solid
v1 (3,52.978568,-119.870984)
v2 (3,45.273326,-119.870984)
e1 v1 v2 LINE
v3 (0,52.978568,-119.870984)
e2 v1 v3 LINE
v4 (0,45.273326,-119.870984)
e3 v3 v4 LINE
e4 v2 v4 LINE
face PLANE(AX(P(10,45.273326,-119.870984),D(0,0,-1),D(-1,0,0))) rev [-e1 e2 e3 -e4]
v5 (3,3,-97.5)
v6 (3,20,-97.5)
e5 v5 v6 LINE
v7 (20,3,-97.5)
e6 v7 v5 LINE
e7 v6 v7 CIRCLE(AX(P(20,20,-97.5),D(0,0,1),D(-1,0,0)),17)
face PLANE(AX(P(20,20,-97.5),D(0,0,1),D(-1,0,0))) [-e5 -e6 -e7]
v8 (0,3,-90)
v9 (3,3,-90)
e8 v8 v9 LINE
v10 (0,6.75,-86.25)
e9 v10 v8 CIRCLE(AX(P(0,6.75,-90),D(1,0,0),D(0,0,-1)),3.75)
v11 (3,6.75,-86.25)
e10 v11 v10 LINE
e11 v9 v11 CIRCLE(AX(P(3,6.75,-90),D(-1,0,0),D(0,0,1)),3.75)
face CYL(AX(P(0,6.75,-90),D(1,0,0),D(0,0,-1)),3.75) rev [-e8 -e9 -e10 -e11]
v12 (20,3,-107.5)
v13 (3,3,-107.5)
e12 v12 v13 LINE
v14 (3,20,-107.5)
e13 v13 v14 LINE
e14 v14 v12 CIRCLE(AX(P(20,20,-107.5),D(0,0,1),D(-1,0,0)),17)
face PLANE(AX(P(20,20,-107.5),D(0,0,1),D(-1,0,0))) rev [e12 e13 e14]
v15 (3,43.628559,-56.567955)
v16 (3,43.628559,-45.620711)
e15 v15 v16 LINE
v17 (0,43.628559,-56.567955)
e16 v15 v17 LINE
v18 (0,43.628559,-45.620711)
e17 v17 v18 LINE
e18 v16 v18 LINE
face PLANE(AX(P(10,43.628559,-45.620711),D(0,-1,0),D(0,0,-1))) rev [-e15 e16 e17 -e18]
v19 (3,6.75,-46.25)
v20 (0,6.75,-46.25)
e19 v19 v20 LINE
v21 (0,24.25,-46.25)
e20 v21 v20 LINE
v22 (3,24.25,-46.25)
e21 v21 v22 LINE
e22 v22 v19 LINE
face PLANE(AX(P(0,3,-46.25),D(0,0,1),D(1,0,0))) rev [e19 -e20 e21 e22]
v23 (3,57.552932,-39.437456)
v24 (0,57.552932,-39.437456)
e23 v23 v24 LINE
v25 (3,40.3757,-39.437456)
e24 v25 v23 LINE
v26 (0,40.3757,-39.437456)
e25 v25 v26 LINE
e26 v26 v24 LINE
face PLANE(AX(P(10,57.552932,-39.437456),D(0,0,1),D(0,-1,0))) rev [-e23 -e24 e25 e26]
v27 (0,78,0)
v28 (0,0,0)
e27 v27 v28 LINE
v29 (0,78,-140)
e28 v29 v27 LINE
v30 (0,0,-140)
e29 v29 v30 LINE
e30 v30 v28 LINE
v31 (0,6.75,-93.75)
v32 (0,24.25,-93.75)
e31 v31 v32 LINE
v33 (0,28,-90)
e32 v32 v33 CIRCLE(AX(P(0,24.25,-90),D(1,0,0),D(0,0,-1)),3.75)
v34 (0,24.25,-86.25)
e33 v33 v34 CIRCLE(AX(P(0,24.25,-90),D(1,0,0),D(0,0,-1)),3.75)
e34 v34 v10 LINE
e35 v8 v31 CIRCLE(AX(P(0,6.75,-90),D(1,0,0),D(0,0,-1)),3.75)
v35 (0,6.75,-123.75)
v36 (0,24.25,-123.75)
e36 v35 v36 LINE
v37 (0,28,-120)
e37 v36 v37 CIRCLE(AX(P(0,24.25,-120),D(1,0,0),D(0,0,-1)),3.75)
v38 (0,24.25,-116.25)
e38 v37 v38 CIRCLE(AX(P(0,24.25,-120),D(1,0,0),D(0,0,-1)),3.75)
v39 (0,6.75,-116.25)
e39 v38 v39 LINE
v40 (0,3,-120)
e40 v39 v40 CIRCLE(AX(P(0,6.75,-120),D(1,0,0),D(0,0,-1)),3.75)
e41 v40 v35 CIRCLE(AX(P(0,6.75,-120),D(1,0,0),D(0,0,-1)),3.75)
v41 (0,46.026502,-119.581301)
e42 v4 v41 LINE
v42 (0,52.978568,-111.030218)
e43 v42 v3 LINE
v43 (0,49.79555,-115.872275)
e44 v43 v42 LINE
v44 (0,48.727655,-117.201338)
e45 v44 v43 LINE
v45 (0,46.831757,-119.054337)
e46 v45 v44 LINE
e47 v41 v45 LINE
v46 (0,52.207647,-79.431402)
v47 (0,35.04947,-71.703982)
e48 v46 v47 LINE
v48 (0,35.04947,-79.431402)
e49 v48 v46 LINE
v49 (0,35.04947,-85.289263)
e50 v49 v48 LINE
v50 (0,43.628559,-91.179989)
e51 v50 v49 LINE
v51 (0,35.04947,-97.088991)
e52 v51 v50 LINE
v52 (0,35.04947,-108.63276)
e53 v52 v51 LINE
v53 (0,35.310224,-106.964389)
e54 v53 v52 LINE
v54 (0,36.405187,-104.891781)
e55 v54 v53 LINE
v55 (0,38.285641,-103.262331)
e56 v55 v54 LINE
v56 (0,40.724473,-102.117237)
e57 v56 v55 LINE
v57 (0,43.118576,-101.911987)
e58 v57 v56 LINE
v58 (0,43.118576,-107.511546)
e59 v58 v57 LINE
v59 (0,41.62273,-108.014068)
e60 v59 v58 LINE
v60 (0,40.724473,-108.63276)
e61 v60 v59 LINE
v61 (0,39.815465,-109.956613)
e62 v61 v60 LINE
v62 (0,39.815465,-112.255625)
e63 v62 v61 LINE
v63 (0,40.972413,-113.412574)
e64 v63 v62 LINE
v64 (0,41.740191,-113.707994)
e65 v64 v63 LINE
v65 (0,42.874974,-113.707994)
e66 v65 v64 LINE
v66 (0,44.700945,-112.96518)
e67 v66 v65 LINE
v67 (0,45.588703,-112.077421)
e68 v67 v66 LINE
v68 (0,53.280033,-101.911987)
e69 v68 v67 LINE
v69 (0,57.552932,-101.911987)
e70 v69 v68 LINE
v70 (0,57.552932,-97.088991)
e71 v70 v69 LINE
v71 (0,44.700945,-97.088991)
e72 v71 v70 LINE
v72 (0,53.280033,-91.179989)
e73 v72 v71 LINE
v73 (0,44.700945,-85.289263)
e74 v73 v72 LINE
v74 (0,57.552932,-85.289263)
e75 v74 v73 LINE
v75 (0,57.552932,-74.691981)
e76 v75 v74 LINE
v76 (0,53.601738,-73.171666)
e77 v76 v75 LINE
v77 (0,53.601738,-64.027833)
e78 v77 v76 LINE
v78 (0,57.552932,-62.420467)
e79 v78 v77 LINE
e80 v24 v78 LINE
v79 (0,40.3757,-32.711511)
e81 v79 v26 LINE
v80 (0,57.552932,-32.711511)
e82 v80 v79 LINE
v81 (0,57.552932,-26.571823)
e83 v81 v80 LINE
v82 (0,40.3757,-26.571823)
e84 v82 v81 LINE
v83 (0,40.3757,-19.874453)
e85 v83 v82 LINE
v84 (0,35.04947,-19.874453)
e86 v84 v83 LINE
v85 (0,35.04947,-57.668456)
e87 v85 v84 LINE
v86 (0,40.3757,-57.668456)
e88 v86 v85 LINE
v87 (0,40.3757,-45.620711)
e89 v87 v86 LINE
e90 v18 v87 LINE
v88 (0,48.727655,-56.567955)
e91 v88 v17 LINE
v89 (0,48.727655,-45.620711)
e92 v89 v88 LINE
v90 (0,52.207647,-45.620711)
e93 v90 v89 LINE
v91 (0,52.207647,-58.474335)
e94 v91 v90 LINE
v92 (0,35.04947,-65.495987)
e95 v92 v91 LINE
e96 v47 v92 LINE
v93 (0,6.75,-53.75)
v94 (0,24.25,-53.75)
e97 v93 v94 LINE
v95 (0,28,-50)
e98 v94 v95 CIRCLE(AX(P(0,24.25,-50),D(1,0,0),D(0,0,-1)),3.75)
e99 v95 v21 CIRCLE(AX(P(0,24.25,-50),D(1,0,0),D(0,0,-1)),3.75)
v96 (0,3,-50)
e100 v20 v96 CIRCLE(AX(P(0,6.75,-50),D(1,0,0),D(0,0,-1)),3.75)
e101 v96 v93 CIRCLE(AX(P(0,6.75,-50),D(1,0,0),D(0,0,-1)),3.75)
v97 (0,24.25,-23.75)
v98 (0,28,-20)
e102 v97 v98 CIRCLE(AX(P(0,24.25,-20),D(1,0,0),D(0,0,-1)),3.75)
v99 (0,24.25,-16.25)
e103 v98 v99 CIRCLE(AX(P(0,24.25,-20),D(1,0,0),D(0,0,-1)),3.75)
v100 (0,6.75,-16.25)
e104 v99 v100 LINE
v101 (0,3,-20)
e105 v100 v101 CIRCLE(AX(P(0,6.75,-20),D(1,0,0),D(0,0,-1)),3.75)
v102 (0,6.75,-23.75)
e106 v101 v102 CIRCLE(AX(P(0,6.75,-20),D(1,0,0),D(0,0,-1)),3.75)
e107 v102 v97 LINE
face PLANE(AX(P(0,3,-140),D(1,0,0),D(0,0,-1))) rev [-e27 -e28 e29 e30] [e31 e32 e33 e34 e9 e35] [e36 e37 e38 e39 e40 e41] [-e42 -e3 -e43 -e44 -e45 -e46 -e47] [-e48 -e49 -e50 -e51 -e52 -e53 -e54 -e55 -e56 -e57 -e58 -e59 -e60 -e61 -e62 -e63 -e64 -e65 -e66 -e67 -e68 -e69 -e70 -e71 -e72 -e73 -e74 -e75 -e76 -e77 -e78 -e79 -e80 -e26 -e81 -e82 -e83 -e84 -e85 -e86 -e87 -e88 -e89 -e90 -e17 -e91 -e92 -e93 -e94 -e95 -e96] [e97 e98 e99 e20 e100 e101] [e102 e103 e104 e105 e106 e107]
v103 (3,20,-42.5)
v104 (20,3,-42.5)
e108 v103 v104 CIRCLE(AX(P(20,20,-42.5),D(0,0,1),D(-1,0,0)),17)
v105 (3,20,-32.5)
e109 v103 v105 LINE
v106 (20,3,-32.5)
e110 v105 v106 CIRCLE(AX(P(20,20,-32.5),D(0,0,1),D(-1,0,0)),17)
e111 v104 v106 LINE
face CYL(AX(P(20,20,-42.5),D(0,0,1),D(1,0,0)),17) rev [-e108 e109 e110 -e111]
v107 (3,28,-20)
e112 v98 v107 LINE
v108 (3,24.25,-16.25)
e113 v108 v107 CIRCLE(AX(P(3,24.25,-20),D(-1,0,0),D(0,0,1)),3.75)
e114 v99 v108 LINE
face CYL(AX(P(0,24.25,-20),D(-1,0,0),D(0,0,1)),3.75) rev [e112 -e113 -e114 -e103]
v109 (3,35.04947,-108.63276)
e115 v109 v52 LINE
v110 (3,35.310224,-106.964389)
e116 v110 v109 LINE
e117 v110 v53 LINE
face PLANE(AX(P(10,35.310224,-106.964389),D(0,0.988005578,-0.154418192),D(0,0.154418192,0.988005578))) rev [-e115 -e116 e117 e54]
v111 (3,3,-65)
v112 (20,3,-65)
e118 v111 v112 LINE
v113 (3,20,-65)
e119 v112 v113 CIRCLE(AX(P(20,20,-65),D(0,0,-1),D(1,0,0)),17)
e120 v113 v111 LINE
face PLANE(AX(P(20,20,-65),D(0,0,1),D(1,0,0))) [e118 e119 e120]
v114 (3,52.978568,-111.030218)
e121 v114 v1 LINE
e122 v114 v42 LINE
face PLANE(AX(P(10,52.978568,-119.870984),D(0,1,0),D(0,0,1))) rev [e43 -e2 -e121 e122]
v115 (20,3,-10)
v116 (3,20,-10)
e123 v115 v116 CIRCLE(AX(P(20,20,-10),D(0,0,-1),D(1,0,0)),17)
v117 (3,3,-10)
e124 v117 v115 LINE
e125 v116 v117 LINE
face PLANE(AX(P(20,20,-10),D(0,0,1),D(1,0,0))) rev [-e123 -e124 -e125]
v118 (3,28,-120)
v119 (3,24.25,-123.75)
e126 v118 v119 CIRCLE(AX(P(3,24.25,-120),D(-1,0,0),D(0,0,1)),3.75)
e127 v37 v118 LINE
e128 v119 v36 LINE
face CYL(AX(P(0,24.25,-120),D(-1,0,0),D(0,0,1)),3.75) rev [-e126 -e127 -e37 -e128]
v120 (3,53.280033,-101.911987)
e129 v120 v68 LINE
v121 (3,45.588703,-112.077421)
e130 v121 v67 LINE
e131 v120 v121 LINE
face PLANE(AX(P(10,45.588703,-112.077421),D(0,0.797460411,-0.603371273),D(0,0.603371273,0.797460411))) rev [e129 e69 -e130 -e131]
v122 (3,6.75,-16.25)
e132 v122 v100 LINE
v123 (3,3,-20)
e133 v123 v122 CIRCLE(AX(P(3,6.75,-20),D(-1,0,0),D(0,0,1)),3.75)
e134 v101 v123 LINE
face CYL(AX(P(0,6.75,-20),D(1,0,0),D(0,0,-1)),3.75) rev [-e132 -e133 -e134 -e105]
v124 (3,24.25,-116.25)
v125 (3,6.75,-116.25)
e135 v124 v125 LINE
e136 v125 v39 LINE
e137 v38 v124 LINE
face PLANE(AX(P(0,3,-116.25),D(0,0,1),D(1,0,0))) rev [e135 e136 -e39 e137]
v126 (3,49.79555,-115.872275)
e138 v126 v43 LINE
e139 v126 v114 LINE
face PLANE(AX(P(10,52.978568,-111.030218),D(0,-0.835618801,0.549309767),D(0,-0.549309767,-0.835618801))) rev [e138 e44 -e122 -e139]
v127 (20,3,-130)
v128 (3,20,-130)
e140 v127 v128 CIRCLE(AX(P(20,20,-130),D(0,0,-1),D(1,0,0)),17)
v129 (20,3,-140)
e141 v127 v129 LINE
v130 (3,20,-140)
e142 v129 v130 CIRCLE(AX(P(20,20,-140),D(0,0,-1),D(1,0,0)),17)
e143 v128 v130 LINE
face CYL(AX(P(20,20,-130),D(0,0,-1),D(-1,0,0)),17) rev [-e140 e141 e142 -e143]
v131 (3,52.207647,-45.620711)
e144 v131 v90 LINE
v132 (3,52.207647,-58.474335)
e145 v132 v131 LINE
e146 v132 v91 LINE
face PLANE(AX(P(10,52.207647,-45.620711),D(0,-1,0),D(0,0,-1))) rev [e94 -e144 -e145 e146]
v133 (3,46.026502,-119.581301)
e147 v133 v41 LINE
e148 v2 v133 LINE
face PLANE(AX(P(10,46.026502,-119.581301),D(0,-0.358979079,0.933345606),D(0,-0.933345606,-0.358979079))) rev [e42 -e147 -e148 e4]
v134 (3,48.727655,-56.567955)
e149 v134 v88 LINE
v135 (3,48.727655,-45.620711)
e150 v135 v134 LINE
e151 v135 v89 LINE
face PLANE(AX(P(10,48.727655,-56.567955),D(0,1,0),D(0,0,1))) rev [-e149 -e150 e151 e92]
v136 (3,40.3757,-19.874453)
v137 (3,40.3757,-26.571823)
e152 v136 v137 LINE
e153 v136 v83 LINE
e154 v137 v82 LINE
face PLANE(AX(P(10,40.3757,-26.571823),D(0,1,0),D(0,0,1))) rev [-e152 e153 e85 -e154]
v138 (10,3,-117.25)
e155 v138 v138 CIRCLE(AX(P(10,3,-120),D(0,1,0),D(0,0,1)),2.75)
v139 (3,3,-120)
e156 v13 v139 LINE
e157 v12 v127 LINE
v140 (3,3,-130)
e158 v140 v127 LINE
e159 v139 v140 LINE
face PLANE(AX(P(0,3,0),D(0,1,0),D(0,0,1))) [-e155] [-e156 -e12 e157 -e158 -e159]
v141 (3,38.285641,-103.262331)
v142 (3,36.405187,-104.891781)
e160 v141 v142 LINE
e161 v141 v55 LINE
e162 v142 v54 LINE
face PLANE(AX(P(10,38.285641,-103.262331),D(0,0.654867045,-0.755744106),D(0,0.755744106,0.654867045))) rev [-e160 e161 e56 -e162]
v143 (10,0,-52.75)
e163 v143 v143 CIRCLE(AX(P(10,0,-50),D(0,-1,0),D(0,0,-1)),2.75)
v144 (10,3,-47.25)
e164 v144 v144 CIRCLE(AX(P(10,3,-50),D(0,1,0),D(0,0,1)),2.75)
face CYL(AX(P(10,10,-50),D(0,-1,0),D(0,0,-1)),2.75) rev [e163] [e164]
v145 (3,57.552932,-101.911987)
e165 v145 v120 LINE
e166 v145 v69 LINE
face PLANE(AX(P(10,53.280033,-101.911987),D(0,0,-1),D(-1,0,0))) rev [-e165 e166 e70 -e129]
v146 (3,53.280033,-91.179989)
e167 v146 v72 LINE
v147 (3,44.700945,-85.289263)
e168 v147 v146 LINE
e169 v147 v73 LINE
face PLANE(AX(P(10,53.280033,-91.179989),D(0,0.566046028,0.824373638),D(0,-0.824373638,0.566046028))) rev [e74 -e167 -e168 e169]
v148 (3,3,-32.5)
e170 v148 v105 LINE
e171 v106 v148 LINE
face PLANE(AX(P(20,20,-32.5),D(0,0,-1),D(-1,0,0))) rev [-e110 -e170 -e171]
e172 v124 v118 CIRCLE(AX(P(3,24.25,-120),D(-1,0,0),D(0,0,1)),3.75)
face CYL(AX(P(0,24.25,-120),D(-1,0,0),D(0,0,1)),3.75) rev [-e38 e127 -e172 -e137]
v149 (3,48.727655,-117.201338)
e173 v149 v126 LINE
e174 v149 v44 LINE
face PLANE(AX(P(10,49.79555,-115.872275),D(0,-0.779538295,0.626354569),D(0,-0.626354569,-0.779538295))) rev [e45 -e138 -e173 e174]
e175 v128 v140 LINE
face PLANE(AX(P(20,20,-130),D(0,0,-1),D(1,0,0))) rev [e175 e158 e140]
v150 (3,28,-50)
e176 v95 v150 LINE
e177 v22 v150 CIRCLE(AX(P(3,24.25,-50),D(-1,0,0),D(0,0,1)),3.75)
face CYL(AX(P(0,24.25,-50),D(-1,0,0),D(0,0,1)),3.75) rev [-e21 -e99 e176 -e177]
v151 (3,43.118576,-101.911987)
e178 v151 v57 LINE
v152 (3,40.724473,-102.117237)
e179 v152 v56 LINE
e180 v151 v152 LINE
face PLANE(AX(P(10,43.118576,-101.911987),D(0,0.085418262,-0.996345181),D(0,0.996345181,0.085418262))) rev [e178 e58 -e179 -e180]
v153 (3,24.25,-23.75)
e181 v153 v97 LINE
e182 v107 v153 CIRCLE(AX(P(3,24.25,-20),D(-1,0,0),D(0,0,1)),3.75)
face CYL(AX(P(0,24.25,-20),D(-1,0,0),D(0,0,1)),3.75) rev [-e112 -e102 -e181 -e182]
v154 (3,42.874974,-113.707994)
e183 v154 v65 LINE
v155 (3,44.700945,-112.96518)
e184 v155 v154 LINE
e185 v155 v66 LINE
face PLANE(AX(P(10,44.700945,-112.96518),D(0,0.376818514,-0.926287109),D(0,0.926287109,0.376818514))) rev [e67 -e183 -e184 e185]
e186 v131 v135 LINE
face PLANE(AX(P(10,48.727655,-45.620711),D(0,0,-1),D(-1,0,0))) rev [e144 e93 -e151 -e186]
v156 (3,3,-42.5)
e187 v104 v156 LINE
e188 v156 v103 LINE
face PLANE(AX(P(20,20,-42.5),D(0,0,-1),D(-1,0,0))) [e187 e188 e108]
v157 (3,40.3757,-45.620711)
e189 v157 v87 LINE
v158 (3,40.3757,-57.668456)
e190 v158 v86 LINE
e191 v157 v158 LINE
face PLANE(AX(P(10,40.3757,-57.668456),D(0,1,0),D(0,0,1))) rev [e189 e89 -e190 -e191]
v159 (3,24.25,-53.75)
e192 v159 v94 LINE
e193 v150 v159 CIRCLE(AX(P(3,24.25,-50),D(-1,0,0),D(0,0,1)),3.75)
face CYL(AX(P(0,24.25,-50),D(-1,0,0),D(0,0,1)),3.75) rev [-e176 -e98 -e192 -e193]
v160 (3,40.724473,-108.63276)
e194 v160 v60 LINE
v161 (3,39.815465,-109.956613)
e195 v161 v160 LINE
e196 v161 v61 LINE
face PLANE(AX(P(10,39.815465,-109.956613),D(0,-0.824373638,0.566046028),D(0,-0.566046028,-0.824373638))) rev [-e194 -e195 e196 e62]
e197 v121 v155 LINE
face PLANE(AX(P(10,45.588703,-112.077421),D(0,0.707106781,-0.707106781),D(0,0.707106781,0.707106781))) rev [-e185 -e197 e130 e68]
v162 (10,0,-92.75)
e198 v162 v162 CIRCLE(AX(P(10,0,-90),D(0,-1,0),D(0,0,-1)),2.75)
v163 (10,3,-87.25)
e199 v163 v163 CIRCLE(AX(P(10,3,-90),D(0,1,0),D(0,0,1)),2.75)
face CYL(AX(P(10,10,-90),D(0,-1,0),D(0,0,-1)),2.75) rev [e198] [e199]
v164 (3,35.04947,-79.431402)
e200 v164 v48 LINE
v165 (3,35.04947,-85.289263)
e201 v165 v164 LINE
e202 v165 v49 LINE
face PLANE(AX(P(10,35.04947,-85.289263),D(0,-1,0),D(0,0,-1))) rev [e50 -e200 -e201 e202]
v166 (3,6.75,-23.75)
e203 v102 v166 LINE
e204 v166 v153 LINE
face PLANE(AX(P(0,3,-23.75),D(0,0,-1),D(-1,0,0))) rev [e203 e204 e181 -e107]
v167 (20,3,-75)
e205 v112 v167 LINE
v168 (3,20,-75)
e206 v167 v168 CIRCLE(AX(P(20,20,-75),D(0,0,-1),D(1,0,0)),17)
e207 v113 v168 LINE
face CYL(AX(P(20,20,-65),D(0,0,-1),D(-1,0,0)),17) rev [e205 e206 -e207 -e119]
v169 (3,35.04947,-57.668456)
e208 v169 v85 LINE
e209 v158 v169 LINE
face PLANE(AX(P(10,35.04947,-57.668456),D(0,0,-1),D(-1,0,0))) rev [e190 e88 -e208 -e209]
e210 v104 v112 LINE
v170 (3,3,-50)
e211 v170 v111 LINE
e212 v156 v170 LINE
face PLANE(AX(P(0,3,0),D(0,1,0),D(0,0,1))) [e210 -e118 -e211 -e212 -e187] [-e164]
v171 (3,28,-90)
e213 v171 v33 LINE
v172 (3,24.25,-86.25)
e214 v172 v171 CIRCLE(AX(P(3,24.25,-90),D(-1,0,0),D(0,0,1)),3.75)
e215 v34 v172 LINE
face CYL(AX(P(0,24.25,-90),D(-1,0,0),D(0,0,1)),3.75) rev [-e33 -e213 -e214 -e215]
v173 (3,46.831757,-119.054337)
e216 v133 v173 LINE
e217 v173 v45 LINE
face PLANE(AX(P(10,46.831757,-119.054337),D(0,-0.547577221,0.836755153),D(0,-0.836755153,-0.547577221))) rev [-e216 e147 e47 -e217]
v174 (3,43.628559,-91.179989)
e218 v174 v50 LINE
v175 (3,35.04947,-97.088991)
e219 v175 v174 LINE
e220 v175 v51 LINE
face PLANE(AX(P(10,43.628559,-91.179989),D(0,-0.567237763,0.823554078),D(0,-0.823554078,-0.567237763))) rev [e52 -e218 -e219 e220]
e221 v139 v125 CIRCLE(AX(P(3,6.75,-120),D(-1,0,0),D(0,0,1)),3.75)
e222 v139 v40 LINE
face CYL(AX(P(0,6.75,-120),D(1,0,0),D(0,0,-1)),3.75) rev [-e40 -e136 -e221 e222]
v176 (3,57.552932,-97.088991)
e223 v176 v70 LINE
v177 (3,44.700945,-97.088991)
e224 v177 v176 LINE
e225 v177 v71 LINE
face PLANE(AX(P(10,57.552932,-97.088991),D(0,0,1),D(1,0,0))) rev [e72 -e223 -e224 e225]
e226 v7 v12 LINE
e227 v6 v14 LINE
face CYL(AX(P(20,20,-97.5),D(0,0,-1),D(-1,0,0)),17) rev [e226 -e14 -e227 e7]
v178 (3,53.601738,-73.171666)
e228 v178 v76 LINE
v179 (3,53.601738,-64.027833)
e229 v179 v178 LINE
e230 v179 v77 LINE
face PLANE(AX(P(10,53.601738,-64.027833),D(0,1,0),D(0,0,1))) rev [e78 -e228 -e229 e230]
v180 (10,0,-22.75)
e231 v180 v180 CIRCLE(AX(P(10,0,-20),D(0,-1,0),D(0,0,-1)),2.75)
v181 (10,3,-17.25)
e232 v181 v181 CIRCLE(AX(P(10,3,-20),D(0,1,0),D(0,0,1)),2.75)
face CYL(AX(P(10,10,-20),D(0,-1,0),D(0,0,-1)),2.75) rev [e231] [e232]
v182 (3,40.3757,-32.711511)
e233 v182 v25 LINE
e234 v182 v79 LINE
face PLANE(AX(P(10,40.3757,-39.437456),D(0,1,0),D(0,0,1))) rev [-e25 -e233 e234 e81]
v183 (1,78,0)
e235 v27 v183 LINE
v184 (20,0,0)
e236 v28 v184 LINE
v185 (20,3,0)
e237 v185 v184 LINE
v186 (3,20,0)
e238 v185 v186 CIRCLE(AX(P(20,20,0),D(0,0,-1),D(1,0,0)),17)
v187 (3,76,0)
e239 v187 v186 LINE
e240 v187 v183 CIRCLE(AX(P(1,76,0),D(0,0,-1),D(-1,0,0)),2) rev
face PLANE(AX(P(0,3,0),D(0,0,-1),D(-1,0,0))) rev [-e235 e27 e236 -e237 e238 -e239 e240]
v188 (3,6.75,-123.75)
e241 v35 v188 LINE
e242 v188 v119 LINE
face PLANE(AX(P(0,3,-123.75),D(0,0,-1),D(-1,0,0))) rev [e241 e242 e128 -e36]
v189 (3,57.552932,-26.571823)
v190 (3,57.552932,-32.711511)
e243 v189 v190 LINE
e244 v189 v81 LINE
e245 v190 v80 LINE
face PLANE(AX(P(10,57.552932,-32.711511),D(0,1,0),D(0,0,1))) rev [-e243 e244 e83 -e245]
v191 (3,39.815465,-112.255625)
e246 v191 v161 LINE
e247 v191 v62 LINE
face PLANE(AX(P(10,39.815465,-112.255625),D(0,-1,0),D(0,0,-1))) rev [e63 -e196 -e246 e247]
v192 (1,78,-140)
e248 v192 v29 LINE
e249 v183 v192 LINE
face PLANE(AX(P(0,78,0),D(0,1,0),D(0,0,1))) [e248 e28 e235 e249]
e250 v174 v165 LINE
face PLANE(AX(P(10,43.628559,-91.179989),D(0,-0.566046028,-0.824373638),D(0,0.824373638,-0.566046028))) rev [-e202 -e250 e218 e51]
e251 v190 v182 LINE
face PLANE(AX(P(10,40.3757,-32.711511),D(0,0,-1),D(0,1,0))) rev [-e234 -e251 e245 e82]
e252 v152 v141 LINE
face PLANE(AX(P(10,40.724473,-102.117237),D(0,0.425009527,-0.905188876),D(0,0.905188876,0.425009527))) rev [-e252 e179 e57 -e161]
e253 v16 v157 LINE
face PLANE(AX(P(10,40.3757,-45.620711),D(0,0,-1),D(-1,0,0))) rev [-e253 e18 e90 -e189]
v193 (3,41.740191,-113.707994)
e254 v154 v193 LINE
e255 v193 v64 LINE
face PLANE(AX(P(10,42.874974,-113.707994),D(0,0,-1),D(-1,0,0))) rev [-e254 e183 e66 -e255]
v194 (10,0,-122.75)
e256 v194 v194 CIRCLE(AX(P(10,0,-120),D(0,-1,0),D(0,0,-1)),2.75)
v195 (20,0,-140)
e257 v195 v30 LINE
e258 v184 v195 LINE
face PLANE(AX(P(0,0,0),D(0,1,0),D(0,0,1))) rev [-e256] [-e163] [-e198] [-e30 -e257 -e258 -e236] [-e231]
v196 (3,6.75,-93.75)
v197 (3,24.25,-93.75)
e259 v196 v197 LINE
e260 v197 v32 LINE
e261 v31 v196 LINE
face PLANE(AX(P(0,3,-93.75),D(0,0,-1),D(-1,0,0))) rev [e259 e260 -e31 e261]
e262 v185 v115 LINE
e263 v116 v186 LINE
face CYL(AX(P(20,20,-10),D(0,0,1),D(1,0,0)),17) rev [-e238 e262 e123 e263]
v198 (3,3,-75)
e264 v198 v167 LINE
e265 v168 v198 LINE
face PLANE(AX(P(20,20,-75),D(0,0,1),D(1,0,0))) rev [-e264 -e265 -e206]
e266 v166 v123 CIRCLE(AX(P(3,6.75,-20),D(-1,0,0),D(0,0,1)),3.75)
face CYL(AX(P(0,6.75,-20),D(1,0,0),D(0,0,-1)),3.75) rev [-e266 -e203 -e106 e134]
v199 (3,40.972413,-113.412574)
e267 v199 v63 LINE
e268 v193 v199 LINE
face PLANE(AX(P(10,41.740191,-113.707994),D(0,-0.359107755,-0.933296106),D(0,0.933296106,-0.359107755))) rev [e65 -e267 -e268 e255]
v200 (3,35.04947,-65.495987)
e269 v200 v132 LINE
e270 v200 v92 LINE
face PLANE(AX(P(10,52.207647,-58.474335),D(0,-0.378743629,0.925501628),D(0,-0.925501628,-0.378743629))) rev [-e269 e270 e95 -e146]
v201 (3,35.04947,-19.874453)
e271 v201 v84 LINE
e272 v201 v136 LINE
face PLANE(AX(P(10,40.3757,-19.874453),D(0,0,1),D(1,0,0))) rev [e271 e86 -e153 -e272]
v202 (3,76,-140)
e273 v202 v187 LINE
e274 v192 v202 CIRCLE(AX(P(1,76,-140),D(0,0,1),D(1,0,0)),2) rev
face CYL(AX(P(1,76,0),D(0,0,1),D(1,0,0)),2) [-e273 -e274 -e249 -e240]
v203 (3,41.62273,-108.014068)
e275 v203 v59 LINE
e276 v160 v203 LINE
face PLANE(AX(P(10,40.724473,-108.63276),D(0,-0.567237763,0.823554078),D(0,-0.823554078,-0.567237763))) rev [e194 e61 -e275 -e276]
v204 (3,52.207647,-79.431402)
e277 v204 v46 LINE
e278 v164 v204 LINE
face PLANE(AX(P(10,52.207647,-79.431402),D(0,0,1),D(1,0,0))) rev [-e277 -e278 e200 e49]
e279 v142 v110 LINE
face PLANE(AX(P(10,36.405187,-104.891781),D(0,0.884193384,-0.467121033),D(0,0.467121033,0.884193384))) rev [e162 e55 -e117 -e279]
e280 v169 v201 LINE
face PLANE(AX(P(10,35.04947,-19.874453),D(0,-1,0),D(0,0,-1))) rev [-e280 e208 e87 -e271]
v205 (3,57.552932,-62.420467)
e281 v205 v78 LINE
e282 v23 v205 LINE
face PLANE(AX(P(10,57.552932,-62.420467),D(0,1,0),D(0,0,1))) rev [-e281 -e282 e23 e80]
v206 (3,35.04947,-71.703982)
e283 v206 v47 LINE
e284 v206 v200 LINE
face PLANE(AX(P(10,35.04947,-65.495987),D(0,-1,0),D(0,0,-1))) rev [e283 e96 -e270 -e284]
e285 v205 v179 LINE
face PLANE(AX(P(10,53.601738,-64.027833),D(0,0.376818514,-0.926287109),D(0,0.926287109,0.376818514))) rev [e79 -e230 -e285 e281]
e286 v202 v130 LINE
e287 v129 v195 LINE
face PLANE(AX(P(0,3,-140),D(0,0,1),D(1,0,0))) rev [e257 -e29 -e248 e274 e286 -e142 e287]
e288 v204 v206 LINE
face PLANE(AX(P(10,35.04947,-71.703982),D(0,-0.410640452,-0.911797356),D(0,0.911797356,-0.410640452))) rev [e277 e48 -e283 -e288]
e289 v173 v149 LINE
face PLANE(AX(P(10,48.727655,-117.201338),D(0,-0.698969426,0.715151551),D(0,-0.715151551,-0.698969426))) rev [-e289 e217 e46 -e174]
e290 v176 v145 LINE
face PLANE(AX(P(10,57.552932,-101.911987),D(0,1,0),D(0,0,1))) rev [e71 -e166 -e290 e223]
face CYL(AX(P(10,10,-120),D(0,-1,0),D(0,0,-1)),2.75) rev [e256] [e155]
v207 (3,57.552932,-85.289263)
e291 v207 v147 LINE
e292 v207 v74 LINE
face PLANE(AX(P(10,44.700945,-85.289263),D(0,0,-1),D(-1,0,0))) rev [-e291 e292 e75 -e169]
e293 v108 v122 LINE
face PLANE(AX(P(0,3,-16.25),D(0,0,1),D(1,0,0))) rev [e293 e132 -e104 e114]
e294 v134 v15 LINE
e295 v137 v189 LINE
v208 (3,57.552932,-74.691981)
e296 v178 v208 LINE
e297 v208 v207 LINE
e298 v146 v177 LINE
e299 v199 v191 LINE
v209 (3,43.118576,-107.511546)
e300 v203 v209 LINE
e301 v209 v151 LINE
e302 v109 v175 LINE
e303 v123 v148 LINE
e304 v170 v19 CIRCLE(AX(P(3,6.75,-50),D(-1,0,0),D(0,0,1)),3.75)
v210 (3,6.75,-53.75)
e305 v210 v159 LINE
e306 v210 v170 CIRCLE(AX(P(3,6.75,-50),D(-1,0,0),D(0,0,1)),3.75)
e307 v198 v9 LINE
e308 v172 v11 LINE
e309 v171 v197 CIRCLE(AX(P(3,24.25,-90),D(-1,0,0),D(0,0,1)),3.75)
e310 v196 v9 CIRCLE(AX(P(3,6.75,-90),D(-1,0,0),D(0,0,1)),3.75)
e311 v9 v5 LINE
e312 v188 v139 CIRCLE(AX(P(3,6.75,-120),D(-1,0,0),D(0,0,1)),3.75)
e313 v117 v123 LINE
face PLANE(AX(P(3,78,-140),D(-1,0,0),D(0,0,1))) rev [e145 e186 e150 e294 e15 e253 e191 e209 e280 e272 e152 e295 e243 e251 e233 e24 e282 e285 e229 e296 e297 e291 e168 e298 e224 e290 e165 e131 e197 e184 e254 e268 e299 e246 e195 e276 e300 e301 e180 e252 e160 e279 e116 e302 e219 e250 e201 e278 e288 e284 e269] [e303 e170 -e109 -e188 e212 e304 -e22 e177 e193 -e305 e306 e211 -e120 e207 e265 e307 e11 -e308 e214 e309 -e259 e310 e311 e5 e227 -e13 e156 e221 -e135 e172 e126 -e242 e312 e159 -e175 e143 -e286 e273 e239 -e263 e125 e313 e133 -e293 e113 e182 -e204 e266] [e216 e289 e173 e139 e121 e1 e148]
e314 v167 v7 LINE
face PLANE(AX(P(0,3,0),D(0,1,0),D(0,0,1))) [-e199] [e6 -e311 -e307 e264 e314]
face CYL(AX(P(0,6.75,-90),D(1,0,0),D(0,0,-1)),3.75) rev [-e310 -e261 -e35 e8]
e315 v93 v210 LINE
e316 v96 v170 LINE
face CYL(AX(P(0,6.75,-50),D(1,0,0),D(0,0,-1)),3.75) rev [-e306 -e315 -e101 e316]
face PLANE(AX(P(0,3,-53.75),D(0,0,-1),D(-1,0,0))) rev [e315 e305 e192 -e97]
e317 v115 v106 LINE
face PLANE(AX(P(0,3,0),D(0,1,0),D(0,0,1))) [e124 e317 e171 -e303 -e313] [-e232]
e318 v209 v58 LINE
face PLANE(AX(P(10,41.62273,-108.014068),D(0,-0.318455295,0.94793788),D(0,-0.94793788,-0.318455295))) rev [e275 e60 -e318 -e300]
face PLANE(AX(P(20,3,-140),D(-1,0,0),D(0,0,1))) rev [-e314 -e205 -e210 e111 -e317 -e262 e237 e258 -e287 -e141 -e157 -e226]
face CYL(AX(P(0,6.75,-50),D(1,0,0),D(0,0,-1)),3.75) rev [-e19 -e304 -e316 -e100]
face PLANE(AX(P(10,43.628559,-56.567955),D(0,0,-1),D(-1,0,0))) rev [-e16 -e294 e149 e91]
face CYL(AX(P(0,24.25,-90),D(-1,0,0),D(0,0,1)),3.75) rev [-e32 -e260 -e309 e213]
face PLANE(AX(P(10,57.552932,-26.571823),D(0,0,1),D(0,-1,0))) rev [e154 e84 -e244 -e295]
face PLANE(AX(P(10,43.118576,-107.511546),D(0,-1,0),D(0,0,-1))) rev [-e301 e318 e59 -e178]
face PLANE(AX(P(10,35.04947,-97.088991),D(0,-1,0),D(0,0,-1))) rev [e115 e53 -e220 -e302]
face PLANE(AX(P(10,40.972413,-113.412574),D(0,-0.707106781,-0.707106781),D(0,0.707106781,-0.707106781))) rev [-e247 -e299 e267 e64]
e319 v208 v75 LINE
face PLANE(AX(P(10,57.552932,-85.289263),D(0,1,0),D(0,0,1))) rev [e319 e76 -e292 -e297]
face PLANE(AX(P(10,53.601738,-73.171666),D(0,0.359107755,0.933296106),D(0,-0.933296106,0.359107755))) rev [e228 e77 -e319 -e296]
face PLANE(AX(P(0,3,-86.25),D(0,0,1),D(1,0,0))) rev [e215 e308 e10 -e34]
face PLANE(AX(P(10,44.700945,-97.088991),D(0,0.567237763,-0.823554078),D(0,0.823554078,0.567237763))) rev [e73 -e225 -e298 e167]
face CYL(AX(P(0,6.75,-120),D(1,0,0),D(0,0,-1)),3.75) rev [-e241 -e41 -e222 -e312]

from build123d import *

# Parameters (mm, degrees)
SKETCH1_W           = 20
SKETCH1_H           = 140
BOSS_EXTRUDE1_DEPTH = 3
SKETCH2_W           = 3
SKETCH2_H           = 140
BOSS_EXTRUDE2_DEPTH = 75
SKETCH4_R           = 2.75
CUT_EXTRUDE1_DEPTH  = 10
CUT_EXTRUDE5_DEPTH  = 10
SKETCH13_W          = 7.5
SKETCH13_H          = 25
CUT_EXTRUDE6_DEPTH  = 162.161409773
BOSS_EXTRUDE3_DEPTH = 10
BOSS_EXTRUDE4_DEPTH = 5
FILLET1_R           = 3.75
BOSS_EXTRUDE5_DEPTH = 5
FILLET2_R           = 2


with BuildPart() as part:
    # Sketch1 → Boss-Extrude1 (new body)
    with BuildSketch(Plane(origin=(0, 0, 0), x_dir=(1, 0, 0), z_dir=(0, 1, 0))):
        with Locations((10, 70)):
            Rectangle(SKETCH1_W, SKETCH1_H)
    extrude(amount=BOSS_EXTRUDE1_DEPTH)

    # Sketch2 → Boss-Extrude2 (add)
    with BuildSketch(Plane(origin=(0, 3, 0), x_dir=(1, 0, 0), z_dir=(0, 1, 0))):
        with Locations((1.5, 70)):
            Rectangle(SKETCH2_W, SKETCH2_H)
    extrude(amount=BOSS_EXTRUDE2_DEPTH)

    # Sketch4 → Cut-Extrude1 (cut)
    with BuildSketch(Plane.XZ):
        with Locations(Location((10, -20, 0), (0, 0, 270))):
            Circle(SKETCH4_R)
        with Locations(Location((10, -50, 0), (0, 0, 270))):
            Circle(SKETCH4_R)
        with Locations(Location((10, -120, 0), (0, 0, 270))):
            Circle(SKETCH4_R)
        with Locations(Location((10, -90, 0), (0, 0, 270))):
            Circle(SKETCH4_R)
    extrude(amount=-CUT_EXTRUDE1_DEPTH, mode=Mode.SUBTRACT)

    # Sketch11 → Cut-Extrude5 (cut)
    with BuildSketch(Plane.ZY):
        Polygon((-19.87445306, 35.049470042), (-57.66845643, 35.049470042), (-57.66845643, 40.375700466), (-45.620710845, 40.375700466), (-45.620710845, 43.628558514), (-56.567955095, 43.628558514), (-56.567955095, 48.727655429), (-45.620710845, 48.727655429), (-45.620710845, 52.207646986), (-58.474335361, 52.207646986), (-65.4959872, 35.049470042), (-71.703981953, 35.049470042), (-79.431402399, 52.207646986), (-79.431402399, 35.049470042), (-85.289263166, 35.049470042), (-91.179988836, 43.628558514), (-97.088991148, 35.049470042), (-108.632759584, 35.049470042), (-106.964389123, 35.31022439), (-104.891781353, 36.405186985), (-103.26233135, 38.285640805), (-102.117236881, 40.724472664), (-101.911986572, 43.118576138), (-107.511545976, 43.118576138), (-108.014068376, 41.622730328), (-108.632759584, 40.724472664), (-109.956613224, 39.815464831), (-112.255625181, 39.815464831), (-113.41257384, 40.97241349), (-113.707994228, 41.740190554), (-113.707994228, 42.874973674), (-112.965179572, 44.700944573), (-112.077421007, 45.588703138), (-101.911986572, 53.280033045), (-101.911986572, 57.552931735), (-97.088991148, 57.552931735), (-97.088991148, 44.700944573), (-91.179988836, 53.280033045), (-85.289263166, 44.700944573), (-85.289263166, 57.552931735), (-74.691981497, 57.552931735), (-73.171666345, 53.601738278), (-64.027833458, 53.601738278), (-62.420466982, 57.552931735), (-39.437456147, 57.552931735), (-39.437456147, 40.375700466), (-32.711511222, 40.375700466), (-32.711511222, 57.552931735), (-26.571823468, 57.552931735), (-26.571823468, 40.375700466), (-19.87445306, 40.375700466), align=None)
        Polygon((-119.870983837, 52.978567636), (-111.030217867, 52.978567636), (-115.109674503, 50.296859936), (-115.872275446, 49.795549834), (-117.201338289, 48.727655429), (-119.05433748, 46.831756703), (-119.581300631, 46.026502002), (-119.870983837, 45.273325665), align=None)
    extrude(amount=-CUT_EXTRUDE5_DEPTH, mode=Mode.SUBTRACT)

    # Sketch13 → Cut-Extrude6 (cut, through all)
    with BuildSketch(Plane(origin=(3, 0, 0), x_dir=(0, 0, -1), z_dir=(1, 0, 0))):
        with Locations((20, 15.5)):
            Rectangle(SKETCH13_W, SKETCH13_H)
        with Locations((50, 15.5)):
            Rectangle(SKETCH13_W, SKETCH13_H)
        with Locations((90, 15.5)):
            Rectangle(SKETCH13_W, SKETCH13_H)
        with Locations((120, 15.5)):
            Rectangle(SKETCH13_W, SKETCH13_H)
    extrude(amount=-CUT_EXTRUDE6_DEPTH, mode=Mode.SUBTRACT)

    # Sketch14 → Boss-Extrude3 (add)
    with BuildSketch(Plane.XY):
        with BuildLine():
            Line((3, 3), (3, 20))
            ThreePointArc((3, 20), (7.97918472, 7.97918472), (20, 3))
            Line((20, 3), (3, 3))
        make_face()
    boss_extrude3 = extrude(amount=-BOSS_EXTRUDE3_DEPTH)

    # Mirror1: Boss-Extrude3 across plane
    add(boss_extrude3.mirror(Plane.XY.offset(-70)))

    # Sketch15 → Boss-Extrude4 (add, symmetric)
    with BuildSketch(Plane.XY.offset(-70)):
        with BuildLine():
            Line((3, 20), (3, 3))
            Line((3, 3), (20, 3))
            ThreePointArc((20, 3), (7.97918472, 7.97918472), (3, 20))
        make_face()
    extrude(amount=BOSS_EXTRUDE4_DEPTH, both=True)

    # Fillet1
    fillet1_edges = [part.edges().sort_by_distance(p)[0] for p in [
        (1.5, 3, -116.25),
        (1.5, 28, -116.25),
        (1.5, 28, -123.75),
        (1.5, 3, -123.75),
        (1.5, 3, -93.75),
        (1.5, 3, -86.25),
        (1.5, 28, -93.75),
        (1.5, 28, -86.25),
        (1.5, 3, -53.75),
        (1.5, 3, -46.25),
        (1.5, 28, -46.25),
        (1.5, 28, -53.75),
        (1.5, 3, -23.75),
        (1.5, 3, -16.25),
        (1.5, 28, -16.25),
        (1.5, 28, -23.75),
    ]]
    fillet(fillet1_edges, radius=FILLET1_R - 0.0001)  # a hair under: the kernel refuses the full size

    # Sketch16 → Boss-Extrude5 (add, symmetric)
    with BuildSketch(Plane(origin=(0, 0, -37.5), x_dir=(-1, 0, 0), z_dir=(0, 0, -1))):
        with BuildLine():
            Line((-20, 3), (-3, 3))
            Line((-3, 3), (-3, 20))
            ThreePointArc((-3, 20), (-7.97918472, 7.97918472), (-20, 3))
        make_face()
    boss_extrude5 = extrude(amount=BOSS_EXTRUDE5_DEPTH, both=True)

    # Mirror2: Boss-Extrude5 across plane
    add(boss_extrude5.mirror(Plane.XY.offset(-70)))

    # Fillet2
    fillet2_edges = [part.edges().sort_by_distance(p)[0] for p in [
        (3, 78, -70),
    ]]
    fillet(fillet2_edges, radius=FILLET2_R)


solid = part.part
